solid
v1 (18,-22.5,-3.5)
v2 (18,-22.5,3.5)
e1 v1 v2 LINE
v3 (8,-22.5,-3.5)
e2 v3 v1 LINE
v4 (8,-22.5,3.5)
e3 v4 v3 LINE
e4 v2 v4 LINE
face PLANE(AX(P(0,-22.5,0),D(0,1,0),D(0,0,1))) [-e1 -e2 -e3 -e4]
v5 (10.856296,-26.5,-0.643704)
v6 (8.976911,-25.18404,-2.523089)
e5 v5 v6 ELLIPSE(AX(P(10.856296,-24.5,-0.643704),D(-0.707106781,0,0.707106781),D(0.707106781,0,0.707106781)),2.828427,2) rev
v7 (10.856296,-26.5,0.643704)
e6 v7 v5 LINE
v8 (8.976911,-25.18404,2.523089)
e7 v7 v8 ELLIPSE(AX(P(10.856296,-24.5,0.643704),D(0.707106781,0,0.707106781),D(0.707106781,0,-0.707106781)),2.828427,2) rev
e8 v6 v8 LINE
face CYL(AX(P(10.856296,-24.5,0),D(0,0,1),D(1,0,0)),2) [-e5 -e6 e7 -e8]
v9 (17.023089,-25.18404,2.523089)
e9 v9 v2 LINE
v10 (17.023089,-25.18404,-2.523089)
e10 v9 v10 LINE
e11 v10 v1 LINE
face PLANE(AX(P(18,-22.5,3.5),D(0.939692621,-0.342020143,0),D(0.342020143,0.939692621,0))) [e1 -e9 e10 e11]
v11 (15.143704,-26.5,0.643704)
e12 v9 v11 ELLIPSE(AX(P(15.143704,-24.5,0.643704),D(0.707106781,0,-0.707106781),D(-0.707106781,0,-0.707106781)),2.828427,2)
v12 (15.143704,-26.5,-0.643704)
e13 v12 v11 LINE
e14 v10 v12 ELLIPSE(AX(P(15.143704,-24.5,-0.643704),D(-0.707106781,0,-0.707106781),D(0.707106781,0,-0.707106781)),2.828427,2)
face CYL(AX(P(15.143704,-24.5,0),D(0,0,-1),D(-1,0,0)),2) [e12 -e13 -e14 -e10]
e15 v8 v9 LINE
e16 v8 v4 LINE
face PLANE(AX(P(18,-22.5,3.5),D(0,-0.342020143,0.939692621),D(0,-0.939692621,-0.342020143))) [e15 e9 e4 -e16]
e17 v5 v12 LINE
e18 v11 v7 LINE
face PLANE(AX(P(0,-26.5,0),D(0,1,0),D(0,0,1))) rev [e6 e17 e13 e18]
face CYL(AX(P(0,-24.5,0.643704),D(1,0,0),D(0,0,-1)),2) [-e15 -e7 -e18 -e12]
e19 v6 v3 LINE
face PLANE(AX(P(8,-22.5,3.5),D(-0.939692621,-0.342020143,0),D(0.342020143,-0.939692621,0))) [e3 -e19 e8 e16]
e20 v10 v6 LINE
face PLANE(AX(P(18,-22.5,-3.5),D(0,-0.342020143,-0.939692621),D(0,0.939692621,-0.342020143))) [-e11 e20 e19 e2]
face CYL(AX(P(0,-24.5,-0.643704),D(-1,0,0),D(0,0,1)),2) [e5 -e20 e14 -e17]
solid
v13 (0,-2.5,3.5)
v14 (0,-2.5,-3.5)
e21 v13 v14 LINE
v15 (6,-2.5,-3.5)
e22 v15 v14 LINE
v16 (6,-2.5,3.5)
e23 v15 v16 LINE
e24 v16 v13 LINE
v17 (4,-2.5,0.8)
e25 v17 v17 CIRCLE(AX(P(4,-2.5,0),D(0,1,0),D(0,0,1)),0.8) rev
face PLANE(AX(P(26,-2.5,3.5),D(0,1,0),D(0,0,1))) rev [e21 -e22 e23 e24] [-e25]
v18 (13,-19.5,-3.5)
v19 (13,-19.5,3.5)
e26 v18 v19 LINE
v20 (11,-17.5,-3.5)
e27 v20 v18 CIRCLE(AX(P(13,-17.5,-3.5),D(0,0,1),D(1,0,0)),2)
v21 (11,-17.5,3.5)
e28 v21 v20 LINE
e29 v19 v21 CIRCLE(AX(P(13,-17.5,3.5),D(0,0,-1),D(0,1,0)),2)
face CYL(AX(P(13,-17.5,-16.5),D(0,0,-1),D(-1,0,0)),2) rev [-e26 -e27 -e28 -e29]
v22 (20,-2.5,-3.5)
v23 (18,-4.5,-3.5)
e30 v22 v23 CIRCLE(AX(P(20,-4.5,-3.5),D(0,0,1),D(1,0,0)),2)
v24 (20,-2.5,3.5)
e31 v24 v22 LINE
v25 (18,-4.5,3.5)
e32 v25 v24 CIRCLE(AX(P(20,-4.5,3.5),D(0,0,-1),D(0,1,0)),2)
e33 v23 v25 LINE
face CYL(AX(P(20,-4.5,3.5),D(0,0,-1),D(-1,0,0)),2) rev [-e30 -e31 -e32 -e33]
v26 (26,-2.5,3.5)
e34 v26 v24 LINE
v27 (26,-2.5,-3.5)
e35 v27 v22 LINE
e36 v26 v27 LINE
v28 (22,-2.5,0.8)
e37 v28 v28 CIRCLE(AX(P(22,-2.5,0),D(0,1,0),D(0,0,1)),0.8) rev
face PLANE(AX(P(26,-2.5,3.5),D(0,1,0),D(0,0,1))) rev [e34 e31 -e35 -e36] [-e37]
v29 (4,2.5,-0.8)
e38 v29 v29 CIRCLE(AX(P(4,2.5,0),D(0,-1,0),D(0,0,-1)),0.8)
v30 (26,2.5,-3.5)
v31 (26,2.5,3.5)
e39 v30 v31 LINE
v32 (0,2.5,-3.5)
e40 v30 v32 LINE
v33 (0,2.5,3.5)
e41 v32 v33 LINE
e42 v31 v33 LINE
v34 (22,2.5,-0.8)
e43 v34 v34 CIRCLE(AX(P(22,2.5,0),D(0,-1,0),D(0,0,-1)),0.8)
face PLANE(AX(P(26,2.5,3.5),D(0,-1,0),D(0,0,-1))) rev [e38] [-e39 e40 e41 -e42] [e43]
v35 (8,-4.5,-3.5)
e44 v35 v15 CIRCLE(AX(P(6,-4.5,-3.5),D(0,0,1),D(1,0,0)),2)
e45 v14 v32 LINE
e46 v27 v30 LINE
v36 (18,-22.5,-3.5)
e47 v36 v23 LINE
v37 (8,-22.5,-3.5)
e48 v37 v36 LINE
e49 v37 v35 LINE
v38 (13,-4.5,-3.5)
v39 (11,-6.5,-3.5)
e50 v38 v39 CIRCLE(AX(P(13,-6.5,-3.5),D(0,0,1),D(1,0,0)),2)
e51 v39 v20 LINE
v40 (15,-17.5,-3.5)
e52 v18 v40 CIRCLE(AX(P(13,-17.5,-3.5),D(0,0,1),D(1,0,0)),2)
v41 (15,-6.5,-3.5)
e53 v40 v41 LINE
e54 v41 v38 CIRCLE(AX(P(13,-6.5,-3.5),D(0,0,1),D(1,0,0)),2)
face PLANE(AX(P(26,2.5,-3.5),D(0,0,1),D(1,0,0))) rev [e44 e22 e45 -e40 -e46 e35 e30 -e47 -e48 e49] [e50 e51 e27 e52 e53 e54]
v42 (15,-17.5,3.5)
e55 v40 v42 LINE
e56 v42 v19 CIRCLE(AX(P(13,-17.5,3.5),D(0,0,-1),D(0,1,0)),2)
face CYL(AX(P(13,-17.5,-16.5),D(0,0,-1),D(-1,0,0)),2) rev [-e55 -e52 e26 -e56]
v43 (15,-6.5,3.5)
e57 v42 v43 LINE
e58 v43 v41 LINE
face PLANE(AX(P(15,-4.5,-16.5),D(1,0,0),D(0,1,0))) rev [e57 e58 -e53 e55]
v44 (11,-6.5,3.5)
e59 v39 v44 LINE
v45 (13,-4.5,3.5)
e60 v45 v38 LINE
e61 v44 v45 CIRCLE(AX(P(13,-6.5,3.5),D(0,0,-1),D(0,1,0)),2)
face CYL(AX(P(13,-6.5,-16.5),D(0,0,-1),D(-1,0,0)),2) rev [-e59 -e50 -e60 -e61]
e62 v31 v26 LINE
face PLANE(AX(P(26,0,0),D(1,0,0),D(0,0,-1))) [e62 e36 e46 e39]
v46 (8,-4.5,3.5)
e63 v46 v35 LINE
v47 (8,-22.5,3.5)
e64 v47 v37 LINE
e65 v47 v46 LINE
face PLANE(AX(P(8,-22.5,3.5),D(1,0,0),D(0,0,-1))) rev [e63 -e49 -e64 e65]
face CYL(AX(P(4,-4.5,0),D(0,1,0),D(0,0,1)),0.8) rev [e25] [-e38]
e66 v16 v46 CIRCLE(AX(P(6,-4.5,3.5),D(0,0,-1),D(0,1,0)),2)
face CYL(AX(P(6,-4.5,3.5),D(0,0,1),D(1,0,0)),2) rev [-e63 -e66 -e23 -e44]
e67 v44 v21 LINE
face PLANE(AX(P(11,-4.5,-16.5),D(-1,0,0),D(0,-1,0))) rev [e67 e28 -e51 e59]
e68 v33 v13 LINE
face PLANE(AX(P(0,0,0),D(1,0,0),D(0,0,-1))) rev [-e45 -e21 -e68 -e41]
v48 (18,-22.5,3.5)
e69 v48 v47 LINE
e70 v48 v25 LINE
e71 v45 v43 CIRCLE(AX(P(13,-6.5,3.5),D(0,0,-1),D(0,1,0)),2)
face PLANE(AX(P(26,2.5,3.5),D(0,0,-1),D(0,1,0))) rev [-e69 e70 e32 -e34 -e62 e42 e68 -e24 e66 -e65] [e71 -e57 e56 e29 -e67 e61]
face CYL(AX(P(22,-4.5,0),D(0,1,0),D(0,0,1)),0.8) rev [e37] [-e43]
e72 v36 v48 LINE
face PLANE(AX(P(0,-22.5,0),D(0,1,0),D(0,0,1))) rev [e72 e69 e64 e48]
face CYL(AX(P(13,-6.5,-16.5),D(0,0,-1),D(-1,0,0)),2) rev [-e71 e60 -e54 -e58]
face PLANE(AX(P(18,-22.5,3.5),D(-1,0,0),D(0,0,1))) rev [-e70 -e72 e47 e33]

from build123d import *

# Parameters (mm, degrees)
SKETCH1_W           = 7
SKETCH1_H           = 5
BOSS_EXTRUDE1_DEPTH = 26
SKETCH3_R           = 0.8
CUT_EXTRUDE1_DEPTH  = 7
SKETCH4_W           = 10
SKETCH4_H           = 7
BOSS_EXTRUDE2_DEPTH = 20
SKETCH5_W           = 4
SKETCH5_H           = 15
CUT_EXTRUDE2_DEPTH  = 20
SKETCH6_W           = 10
SKETCH6_H           = 7
BOSS_EXTRUDE3_DEPTH = 4
BOSS_EXTRUDE3_TAPER = 20
FILLET2_R           = 2
FILLET5_R           = 2
FILLET8_R           = 2


with BuildPart() as part:
    # Sketch1 → Boss-Extrude1 (new body)
    with BuildSketch(Plane(origin=(0, 0, 0), x_dir=(0, 0, -1), z_dir=(1, 0, 0))):
        Rectangle(SKETCH1_W, SKETCH1_H)
    extrude(amount=BOSS_EXTRUDE1_DEPTH)

    # Sketch3 → Cut-Extrude1 (cut)
    with BuildSketch(Plane(origin=(0, 2.5, -8.047205284), x_dir=(1, 0, 0), z_dir=(0, -1, 0))):
        with Locations(Location((4, 8.047205284, 0), (0, 0, 90))):
            Circle(SKETCH3_R)
        with Locations(Location((22, 8.047205284, 0), (0, 0, 90))):
            Circle(SKETCH3_R)
    extrude(amount=CUT_EXTRUDE1_DEPTH, mode=Mode.SUBTRACT)

    # Sketch4 → Boss-Extrude2 (add)
    with BuildSketch(Plane.XZ.offset(2.5)):
        with Locations((13, 0)):
            Rectangle(SKETCH4_W, SKETCH4_H)
    extrude(amount=BOSS_EXTRUDE2_DEPTH)

    # Sketch5 → Cut-Extrude2 (cut)
    with BuildSketch(Plane.XY.offset(3.5)):
        with Locations((13, -12)):
            Rectangle(SKETCH5_W, SKETCH5_H)
    extrude(amount=-CUT_EXTRUDE2_DEPTH, mode=Mode.SUBTRACT)

    # Fillet2
    fillet2_edges = [part.edges().sort_by_distance(p)[0] for p in [
        (15, -4.5, 0),
        (11, -4.5, 0),
        (15, -19.5, 0),
        (11, -19.5, 0),
    ]]
    fillet(fillet2_edges, radius=FILLET2_R - 0.0001)  # a hair under: the kernel refuses the full size

    # Fillet5
    fillet5_edges = [part.edges().sort_by_distance(p)[0] for p in [
        (8, -2.5, 0),
        (18, -2.5, 0),
    ]]
    fillet(fillet5_edges, radius=FILLET5_R)


with BuildPart() as body_2:
    # Sketch6 → Boss-Extrude3 (new body)
    with BuildSketch(Plane.XZ.offset(22.5)):
        with Locations((13, 0)):
            Rectangle(SKETCH6_W, SKETCH6_H)
    extrude(amount=BOSS_EXTRUDE3_DEPTH, taper=BOSS_EXTRUDE3_TAPER)

    # Fillet8
    fillet8_edges = [body_2.edges().sort_by_distance(p)[0] for p in [
        (9.455880937, -26.5, 0),
        (13, -26.5, -2.044119063),
        (16.544119063, -26.5, 0),
        (13, -26.5, 2.044119063),
    ]]
    fillet(fillet8_edges, radius=FILLET8_R)


solid = Compound([part.part, body_2.part])
